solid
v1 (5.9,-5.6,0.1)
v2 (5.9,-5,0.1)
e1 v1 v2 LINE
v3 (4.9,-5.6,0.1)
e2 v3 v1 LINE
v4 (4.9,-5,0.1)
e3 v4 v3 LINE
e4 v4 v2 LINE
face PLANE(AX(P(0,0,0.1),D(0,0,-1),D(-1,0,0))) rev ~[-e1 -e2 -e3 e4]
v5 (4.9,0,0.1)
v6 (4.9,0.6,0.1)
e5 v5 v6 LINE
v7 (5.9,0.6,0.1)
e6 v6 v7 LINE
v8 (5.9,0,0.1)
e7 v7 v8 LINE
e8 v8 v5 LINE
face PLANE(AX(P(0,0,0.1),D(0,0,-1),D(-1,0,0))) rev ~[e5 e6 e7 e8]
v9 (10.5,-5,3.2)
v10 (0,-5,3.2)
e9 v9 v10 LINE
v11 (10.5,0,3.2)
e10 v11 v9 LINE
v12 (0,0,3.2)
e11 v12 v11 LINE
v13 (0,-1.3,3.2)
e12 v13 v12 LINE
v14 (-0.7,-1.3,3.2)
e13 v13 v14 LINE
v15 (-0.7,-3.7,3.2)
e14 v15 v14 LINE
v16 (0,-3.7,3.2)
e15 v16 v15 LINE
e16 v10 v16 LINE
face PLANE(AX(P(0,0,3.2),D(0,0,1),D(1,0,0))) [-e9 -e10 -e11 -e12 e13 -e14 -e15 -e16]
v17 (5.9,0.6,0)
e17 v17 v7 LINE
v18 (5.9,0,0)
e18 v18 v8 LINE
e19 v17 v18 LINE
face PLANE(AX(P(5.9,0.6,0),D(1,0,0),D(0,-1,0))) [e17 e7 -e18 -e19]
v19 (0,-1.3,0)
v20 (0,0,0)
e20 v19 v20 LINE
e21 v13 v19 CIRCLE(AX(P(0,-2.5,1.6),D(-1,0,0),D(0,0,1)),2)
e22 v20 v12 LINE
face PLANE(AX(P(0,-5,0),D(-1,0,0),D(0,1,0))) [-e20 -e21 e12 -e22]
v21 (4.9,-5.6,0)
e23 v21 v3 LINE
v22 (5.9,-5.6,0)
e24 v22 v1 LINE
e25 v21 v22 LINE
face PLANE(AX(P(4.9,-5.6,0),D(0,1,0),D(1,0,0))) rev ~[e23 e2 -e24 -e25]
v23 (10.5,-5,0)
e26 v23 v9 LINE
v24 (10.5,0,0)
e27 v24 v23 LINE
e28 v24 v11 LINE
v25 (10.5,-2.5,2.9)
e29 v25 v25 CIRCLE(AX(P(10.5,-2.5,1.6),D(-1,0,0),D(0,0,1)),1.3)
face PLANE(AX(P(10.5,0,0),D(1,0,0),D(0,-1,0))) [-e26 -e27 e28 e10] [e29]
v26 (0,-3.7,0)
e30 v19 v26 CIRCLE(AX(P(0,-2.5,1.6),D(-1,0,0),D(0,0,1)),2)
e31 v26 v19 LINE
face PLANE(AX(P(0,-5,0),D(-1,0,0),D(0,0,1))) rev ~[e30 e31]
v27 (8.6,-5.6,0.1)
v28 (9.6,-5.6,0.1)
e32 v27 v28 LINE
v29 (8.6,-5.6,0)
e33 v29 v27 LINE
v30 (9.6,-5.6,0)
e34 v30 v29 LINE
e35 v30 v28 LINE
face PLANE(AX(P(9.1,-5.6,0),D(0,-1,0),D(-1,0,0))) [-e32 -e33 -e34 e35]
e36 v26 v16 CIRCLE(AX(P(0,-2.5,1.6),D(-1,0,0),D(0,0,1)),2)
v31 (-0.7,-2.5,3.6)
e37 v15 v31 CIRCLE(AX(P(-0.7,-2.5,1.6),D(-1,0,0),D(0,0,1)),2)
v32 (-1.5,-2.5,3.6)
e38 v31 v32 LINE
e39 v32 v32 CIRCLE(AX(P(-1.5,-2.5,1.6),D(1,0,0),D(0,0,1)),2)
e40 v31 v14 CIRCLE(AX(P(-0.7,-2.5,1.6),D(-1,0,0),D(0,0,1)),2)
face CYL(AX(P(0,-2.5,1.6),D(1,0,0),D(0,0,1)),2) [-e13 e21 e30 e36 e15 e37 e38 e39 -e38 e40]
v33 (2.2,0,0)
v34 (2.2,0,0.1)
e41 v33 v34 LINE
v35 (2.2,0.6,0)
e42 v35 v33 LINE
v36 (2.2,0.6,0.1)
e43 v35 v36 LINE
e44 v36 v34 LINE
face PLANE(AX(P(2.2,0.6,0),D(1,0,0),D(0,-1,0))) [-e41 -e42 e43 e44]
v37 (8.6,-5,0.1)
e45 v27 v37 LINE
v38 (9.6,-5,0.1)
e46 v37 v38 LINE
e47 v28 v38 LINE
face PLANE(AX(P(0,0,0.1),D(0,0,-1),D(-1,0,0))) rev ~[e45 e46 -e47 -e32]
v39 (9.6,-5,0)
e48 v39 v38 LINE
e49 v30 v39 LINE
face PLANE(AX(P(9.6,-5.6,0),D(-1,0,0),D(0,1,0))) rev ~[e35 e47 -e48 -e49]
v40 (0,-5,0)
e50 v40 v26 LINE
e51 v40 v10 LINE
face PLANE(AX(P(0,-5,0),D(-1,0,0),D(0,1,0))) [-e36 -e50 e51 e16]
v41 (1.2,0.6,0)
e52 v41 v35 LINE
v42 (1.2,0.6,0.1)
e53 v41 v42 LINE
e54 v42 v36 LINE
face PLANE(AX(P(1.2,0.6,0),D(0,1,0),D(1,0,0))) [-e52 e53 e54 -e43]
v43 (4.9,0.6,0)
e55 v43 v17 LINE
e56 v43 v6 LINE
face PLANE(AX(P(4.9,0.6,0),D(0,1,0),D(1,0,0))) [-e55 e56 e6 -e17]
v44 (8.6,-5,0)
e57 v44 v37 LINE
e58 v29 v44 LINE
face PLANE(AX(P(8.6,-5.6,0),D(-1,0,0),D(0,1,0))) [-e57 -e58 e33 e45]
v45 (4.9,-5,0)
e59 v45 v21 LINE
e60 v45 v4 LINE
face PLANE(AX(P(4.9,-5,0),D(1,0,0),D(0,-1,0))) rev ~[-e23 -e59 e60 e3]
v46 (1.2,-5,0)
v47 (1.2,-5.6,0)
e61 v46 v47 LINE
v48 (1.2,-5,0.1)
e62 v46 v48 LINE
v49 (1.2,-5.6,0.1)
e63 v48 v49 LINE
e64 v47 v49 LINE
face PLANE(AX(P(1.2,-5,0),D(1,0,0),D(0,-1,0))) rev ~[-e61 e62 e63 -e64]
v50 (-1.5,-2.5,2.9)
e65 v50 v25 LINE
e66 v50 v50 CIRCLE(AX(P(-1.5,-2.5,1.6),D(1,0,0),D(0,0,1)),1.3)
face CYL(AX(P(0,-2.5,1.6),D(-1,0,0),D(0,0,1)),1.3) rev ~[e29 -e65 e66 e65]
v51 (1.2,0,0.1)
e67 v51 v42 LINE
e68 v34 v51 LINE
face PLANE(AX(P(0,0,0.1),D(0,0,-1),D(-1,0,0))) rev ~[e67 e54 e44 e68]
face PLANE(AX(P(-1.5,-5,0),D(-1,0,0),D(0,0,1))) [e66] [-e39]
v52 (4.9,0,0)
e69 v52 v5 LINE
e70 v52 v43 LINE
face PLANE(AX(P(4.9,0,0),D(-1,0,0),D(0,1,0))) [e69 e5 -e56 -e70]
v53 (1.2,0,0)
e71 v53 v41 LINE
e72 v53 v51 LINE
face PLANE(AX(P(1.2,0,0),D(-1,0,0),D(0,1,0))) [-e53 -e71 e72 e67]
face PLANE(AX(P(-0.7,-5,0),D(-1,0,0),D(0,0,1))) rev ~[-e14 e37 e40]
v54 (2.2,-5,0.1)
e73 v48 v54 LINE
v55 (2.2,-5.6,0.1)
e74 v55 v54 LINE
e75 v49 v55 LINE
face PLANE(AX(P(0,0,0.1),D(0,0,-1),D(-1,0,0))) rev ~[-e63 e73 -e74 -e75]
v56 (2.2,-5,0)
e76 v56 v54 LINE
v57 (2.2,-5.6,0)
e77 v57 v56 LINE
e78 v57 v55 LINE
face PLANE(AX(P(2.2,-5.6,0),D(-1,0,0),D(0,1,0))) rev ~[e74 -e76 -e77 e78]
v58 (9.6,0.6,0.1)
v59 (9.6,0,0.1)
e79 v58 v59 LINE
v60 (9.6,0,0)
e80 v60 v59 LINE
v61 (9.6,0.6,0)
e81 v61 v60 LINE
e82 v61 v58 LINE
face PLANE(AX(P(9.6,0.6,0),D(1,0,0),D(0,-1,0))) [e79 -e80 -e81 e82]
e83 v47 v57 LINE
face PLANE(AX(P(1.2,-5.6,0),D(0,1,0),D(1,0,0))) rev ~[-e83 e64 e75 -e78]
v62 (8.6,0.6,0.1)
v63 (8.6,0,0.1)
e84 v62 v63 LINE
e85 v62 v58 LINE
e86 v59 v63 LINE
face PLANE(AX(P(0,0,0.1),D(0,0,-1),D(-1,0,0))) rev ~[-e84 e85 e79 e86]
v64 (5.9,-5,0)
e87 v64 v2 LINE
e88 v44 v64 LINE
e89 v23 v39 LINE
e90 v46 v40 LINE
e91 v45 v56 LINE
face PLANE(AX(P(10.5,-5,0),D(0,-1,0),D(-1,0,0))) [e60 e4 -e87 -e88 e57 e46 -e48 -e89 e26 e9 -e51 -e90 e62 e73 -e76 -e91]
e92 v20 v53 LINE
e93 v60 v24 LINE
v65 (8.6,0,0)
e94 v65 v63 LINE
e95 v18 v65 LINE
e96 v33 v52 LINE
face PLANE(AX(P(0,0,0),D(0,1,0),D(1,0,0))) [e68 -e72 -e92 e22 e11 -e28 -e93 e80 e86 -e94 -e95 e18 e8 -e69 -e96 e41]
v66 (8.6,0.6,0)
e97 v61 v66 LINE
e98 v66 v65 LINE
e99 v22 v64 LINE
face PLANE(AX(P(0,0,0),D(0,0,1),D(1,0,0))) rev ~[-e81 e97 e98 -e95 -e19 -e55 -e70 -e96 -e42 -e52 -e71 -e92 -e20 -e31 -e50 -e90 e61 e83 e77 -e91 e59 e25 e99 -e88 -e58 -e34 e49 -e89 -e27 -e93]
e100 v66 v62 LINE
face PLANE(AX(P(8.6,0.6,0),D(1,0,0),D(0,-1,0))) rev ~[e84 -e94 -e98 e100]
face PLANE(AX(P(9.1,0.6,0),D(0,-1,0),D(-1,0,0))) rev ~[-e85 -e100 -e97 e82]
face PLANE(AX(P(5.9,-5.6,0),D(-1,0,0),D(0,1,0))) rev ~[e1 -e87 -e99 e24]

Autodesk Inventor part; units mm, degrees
ref_plane "YZ Plane" through (0, 0, 0) normal (1, 0, 0) x (0, 1, 0)
ref_plane "XZ Plane" through (0, 0, 0) normal (0, 1, 0) x (-1, 0, 0)
ref_plane "XY Plane" through (0, 0, 0) normal (0, 0, 1) x (1, 0, 0)
sketch "Sketch1" plane through (0, 0, 0) normal (0, 0, 1) x (1, 0, 0)
  line L0 (0, 0) -> (10.5, 0)
  line L1 (10.5, 0) -> (10.5, -5)
  line L2 (10.5, -5) -> (0, -5)
  line L3 (0, -5) -> (0, 0)
  dimension "d0" = 10.5
  dimension "d1" = 5
extrude "Extrusion1" add sketch "Sketch1" along normal blind 3.2
sketch "Sketch2" plane through (0, -5, 0) normal (-1, 0, 0) x (0, 0, 1)
  line L0 (0, 0) -> (0, 5) projected
  line L1 (0, 2.5) -> (1.6, 2.5)
  circle A0 centre (1.6, 2.5) radius 1.3
  circle A1 centre (1.6, 2.5) radius 2
  point P0 (0, 1.3)
  point P1 (0, 3.7)
  dimension "d4" = 1.6
  dimension "d5" = 2.6
  dimension "d6" = 4
extrude "Extrusion2" add sketch "Sketch2" along normal blind 1.5
extrude "Extrusion3" cut sketch "Sketch2" against normal through all contours A0
move faces "Move1" translate (-0.7, 0, 0) faces at (0, -2.7773, 3.2729)
sketch "Sketch3" plane through (0, 0, 0) normal (0, 0, -1) x (-1, 0, 0)
  line L0 (0, 0) -> (0, -5) projected
  line L1 (0, -5) -> (0, 0)
  line L2 (0, -2.5) -> (-9.1, -2.5)
  line L3 (-9.1, -2.5) -> (-9.1, -5.6)
  line L4 (-9.1, -5.6) -> (-8.6, -5.6)
  line L5 (-9.1, -5.6) -> (-9.6, -5.6)
  line L6 (-9.6, -5.6) -> (-9.6, -5)
  line L7 (0, -5) -> (-10.5, -5) projected
  line L8 (-8.6, -5.6) -> (-8.6, -5)
  line L9 (-9.6, -5) -> (-8.6, -5)
  line L10 (-9.1, -5) -> (-5.4, -5)
  line L11 (-5.4, -5) -> (-4.9, -5)
  line L12 (-4.9, -5) -> (-4.9, -5.6)
  line L13 (-4.9, -5.6) -> (-5.9, -5.6)
  line L14 (-5.9, -5.6) -> (-5.9, -5)
  line L15 (-5.4, -5) -> (-1.7, -5)
  line L16 (-1.7, -5) -> (-1.2, -5)
  line L17 (-1.2, -5) -> (-1.2, -5.6)
  line L18 (-1.2, -5.6) -> (-2.2, -5.6)
  line L19 (-2.2, -5.6) -> (-2.2, -5)
  line L20 (-9.1, 0.6) -> (-8.6, 0.6)
  line L21 (-9.1, 0.6) -> (-9.6, 0.6)
  line L22 (-9.6, 0.6) -> (-9.6, 0)
  line L23 (-8.6, 0.6) -> (-8.6, 0)
  line L24 (-9.6, 0) -> (-8.6, 0)
  line L25 (-9.1, 0) -> (-5.4, 0)
  line L26 (-5.4, 0) -> (-4.9, 0)
  line L27 (-4.9, 0) -> (-4.9, 0.6)
  line L28 (-4.9, 0.6) -> (-5.9, 0.6)
  line L29 (-5.9, 0.6) -> (-5.9, 0)
  line L30 (-5.4, 0) -> (-1.7, 0)
  line L31 (-1.7, 0) -> (-1.2, 0)
  line L32 (-1.2, 0) -> (-1.2, 0.6)
  line L33 (-1.2, 0.6) -> (-2.2, 0.6)
  line L34 (-2.2, 0.6) -> (-2.2, 0)
  point P0 (0, -3.7)
  dimension "d14" = 9.1
  dimension "d15" = 3.1
  dimension "d16" = 0.5
  dimension "d17" = 0.5
  dimension "d18" = 3.7
  dimension "d19" = 0.5
  dimension "d20" = 1
  dimension "d21" = 3.7
  dimension "d22" = 0.5
  dimension "d23" = 1
extrude "Extrusion4" add sketch "Sketch3" against normal blind 0.1 contours L17 L18 L19 L7 | L7 L8 L4 L3 | L3 L5 L6 L7 | L7 L12 L13 L14 | L20 L23 L24 L22 L21 | L29 L28 L27 L26 L25 | L34 L33 L32 L31 L30
properties part number "PJ-242"
